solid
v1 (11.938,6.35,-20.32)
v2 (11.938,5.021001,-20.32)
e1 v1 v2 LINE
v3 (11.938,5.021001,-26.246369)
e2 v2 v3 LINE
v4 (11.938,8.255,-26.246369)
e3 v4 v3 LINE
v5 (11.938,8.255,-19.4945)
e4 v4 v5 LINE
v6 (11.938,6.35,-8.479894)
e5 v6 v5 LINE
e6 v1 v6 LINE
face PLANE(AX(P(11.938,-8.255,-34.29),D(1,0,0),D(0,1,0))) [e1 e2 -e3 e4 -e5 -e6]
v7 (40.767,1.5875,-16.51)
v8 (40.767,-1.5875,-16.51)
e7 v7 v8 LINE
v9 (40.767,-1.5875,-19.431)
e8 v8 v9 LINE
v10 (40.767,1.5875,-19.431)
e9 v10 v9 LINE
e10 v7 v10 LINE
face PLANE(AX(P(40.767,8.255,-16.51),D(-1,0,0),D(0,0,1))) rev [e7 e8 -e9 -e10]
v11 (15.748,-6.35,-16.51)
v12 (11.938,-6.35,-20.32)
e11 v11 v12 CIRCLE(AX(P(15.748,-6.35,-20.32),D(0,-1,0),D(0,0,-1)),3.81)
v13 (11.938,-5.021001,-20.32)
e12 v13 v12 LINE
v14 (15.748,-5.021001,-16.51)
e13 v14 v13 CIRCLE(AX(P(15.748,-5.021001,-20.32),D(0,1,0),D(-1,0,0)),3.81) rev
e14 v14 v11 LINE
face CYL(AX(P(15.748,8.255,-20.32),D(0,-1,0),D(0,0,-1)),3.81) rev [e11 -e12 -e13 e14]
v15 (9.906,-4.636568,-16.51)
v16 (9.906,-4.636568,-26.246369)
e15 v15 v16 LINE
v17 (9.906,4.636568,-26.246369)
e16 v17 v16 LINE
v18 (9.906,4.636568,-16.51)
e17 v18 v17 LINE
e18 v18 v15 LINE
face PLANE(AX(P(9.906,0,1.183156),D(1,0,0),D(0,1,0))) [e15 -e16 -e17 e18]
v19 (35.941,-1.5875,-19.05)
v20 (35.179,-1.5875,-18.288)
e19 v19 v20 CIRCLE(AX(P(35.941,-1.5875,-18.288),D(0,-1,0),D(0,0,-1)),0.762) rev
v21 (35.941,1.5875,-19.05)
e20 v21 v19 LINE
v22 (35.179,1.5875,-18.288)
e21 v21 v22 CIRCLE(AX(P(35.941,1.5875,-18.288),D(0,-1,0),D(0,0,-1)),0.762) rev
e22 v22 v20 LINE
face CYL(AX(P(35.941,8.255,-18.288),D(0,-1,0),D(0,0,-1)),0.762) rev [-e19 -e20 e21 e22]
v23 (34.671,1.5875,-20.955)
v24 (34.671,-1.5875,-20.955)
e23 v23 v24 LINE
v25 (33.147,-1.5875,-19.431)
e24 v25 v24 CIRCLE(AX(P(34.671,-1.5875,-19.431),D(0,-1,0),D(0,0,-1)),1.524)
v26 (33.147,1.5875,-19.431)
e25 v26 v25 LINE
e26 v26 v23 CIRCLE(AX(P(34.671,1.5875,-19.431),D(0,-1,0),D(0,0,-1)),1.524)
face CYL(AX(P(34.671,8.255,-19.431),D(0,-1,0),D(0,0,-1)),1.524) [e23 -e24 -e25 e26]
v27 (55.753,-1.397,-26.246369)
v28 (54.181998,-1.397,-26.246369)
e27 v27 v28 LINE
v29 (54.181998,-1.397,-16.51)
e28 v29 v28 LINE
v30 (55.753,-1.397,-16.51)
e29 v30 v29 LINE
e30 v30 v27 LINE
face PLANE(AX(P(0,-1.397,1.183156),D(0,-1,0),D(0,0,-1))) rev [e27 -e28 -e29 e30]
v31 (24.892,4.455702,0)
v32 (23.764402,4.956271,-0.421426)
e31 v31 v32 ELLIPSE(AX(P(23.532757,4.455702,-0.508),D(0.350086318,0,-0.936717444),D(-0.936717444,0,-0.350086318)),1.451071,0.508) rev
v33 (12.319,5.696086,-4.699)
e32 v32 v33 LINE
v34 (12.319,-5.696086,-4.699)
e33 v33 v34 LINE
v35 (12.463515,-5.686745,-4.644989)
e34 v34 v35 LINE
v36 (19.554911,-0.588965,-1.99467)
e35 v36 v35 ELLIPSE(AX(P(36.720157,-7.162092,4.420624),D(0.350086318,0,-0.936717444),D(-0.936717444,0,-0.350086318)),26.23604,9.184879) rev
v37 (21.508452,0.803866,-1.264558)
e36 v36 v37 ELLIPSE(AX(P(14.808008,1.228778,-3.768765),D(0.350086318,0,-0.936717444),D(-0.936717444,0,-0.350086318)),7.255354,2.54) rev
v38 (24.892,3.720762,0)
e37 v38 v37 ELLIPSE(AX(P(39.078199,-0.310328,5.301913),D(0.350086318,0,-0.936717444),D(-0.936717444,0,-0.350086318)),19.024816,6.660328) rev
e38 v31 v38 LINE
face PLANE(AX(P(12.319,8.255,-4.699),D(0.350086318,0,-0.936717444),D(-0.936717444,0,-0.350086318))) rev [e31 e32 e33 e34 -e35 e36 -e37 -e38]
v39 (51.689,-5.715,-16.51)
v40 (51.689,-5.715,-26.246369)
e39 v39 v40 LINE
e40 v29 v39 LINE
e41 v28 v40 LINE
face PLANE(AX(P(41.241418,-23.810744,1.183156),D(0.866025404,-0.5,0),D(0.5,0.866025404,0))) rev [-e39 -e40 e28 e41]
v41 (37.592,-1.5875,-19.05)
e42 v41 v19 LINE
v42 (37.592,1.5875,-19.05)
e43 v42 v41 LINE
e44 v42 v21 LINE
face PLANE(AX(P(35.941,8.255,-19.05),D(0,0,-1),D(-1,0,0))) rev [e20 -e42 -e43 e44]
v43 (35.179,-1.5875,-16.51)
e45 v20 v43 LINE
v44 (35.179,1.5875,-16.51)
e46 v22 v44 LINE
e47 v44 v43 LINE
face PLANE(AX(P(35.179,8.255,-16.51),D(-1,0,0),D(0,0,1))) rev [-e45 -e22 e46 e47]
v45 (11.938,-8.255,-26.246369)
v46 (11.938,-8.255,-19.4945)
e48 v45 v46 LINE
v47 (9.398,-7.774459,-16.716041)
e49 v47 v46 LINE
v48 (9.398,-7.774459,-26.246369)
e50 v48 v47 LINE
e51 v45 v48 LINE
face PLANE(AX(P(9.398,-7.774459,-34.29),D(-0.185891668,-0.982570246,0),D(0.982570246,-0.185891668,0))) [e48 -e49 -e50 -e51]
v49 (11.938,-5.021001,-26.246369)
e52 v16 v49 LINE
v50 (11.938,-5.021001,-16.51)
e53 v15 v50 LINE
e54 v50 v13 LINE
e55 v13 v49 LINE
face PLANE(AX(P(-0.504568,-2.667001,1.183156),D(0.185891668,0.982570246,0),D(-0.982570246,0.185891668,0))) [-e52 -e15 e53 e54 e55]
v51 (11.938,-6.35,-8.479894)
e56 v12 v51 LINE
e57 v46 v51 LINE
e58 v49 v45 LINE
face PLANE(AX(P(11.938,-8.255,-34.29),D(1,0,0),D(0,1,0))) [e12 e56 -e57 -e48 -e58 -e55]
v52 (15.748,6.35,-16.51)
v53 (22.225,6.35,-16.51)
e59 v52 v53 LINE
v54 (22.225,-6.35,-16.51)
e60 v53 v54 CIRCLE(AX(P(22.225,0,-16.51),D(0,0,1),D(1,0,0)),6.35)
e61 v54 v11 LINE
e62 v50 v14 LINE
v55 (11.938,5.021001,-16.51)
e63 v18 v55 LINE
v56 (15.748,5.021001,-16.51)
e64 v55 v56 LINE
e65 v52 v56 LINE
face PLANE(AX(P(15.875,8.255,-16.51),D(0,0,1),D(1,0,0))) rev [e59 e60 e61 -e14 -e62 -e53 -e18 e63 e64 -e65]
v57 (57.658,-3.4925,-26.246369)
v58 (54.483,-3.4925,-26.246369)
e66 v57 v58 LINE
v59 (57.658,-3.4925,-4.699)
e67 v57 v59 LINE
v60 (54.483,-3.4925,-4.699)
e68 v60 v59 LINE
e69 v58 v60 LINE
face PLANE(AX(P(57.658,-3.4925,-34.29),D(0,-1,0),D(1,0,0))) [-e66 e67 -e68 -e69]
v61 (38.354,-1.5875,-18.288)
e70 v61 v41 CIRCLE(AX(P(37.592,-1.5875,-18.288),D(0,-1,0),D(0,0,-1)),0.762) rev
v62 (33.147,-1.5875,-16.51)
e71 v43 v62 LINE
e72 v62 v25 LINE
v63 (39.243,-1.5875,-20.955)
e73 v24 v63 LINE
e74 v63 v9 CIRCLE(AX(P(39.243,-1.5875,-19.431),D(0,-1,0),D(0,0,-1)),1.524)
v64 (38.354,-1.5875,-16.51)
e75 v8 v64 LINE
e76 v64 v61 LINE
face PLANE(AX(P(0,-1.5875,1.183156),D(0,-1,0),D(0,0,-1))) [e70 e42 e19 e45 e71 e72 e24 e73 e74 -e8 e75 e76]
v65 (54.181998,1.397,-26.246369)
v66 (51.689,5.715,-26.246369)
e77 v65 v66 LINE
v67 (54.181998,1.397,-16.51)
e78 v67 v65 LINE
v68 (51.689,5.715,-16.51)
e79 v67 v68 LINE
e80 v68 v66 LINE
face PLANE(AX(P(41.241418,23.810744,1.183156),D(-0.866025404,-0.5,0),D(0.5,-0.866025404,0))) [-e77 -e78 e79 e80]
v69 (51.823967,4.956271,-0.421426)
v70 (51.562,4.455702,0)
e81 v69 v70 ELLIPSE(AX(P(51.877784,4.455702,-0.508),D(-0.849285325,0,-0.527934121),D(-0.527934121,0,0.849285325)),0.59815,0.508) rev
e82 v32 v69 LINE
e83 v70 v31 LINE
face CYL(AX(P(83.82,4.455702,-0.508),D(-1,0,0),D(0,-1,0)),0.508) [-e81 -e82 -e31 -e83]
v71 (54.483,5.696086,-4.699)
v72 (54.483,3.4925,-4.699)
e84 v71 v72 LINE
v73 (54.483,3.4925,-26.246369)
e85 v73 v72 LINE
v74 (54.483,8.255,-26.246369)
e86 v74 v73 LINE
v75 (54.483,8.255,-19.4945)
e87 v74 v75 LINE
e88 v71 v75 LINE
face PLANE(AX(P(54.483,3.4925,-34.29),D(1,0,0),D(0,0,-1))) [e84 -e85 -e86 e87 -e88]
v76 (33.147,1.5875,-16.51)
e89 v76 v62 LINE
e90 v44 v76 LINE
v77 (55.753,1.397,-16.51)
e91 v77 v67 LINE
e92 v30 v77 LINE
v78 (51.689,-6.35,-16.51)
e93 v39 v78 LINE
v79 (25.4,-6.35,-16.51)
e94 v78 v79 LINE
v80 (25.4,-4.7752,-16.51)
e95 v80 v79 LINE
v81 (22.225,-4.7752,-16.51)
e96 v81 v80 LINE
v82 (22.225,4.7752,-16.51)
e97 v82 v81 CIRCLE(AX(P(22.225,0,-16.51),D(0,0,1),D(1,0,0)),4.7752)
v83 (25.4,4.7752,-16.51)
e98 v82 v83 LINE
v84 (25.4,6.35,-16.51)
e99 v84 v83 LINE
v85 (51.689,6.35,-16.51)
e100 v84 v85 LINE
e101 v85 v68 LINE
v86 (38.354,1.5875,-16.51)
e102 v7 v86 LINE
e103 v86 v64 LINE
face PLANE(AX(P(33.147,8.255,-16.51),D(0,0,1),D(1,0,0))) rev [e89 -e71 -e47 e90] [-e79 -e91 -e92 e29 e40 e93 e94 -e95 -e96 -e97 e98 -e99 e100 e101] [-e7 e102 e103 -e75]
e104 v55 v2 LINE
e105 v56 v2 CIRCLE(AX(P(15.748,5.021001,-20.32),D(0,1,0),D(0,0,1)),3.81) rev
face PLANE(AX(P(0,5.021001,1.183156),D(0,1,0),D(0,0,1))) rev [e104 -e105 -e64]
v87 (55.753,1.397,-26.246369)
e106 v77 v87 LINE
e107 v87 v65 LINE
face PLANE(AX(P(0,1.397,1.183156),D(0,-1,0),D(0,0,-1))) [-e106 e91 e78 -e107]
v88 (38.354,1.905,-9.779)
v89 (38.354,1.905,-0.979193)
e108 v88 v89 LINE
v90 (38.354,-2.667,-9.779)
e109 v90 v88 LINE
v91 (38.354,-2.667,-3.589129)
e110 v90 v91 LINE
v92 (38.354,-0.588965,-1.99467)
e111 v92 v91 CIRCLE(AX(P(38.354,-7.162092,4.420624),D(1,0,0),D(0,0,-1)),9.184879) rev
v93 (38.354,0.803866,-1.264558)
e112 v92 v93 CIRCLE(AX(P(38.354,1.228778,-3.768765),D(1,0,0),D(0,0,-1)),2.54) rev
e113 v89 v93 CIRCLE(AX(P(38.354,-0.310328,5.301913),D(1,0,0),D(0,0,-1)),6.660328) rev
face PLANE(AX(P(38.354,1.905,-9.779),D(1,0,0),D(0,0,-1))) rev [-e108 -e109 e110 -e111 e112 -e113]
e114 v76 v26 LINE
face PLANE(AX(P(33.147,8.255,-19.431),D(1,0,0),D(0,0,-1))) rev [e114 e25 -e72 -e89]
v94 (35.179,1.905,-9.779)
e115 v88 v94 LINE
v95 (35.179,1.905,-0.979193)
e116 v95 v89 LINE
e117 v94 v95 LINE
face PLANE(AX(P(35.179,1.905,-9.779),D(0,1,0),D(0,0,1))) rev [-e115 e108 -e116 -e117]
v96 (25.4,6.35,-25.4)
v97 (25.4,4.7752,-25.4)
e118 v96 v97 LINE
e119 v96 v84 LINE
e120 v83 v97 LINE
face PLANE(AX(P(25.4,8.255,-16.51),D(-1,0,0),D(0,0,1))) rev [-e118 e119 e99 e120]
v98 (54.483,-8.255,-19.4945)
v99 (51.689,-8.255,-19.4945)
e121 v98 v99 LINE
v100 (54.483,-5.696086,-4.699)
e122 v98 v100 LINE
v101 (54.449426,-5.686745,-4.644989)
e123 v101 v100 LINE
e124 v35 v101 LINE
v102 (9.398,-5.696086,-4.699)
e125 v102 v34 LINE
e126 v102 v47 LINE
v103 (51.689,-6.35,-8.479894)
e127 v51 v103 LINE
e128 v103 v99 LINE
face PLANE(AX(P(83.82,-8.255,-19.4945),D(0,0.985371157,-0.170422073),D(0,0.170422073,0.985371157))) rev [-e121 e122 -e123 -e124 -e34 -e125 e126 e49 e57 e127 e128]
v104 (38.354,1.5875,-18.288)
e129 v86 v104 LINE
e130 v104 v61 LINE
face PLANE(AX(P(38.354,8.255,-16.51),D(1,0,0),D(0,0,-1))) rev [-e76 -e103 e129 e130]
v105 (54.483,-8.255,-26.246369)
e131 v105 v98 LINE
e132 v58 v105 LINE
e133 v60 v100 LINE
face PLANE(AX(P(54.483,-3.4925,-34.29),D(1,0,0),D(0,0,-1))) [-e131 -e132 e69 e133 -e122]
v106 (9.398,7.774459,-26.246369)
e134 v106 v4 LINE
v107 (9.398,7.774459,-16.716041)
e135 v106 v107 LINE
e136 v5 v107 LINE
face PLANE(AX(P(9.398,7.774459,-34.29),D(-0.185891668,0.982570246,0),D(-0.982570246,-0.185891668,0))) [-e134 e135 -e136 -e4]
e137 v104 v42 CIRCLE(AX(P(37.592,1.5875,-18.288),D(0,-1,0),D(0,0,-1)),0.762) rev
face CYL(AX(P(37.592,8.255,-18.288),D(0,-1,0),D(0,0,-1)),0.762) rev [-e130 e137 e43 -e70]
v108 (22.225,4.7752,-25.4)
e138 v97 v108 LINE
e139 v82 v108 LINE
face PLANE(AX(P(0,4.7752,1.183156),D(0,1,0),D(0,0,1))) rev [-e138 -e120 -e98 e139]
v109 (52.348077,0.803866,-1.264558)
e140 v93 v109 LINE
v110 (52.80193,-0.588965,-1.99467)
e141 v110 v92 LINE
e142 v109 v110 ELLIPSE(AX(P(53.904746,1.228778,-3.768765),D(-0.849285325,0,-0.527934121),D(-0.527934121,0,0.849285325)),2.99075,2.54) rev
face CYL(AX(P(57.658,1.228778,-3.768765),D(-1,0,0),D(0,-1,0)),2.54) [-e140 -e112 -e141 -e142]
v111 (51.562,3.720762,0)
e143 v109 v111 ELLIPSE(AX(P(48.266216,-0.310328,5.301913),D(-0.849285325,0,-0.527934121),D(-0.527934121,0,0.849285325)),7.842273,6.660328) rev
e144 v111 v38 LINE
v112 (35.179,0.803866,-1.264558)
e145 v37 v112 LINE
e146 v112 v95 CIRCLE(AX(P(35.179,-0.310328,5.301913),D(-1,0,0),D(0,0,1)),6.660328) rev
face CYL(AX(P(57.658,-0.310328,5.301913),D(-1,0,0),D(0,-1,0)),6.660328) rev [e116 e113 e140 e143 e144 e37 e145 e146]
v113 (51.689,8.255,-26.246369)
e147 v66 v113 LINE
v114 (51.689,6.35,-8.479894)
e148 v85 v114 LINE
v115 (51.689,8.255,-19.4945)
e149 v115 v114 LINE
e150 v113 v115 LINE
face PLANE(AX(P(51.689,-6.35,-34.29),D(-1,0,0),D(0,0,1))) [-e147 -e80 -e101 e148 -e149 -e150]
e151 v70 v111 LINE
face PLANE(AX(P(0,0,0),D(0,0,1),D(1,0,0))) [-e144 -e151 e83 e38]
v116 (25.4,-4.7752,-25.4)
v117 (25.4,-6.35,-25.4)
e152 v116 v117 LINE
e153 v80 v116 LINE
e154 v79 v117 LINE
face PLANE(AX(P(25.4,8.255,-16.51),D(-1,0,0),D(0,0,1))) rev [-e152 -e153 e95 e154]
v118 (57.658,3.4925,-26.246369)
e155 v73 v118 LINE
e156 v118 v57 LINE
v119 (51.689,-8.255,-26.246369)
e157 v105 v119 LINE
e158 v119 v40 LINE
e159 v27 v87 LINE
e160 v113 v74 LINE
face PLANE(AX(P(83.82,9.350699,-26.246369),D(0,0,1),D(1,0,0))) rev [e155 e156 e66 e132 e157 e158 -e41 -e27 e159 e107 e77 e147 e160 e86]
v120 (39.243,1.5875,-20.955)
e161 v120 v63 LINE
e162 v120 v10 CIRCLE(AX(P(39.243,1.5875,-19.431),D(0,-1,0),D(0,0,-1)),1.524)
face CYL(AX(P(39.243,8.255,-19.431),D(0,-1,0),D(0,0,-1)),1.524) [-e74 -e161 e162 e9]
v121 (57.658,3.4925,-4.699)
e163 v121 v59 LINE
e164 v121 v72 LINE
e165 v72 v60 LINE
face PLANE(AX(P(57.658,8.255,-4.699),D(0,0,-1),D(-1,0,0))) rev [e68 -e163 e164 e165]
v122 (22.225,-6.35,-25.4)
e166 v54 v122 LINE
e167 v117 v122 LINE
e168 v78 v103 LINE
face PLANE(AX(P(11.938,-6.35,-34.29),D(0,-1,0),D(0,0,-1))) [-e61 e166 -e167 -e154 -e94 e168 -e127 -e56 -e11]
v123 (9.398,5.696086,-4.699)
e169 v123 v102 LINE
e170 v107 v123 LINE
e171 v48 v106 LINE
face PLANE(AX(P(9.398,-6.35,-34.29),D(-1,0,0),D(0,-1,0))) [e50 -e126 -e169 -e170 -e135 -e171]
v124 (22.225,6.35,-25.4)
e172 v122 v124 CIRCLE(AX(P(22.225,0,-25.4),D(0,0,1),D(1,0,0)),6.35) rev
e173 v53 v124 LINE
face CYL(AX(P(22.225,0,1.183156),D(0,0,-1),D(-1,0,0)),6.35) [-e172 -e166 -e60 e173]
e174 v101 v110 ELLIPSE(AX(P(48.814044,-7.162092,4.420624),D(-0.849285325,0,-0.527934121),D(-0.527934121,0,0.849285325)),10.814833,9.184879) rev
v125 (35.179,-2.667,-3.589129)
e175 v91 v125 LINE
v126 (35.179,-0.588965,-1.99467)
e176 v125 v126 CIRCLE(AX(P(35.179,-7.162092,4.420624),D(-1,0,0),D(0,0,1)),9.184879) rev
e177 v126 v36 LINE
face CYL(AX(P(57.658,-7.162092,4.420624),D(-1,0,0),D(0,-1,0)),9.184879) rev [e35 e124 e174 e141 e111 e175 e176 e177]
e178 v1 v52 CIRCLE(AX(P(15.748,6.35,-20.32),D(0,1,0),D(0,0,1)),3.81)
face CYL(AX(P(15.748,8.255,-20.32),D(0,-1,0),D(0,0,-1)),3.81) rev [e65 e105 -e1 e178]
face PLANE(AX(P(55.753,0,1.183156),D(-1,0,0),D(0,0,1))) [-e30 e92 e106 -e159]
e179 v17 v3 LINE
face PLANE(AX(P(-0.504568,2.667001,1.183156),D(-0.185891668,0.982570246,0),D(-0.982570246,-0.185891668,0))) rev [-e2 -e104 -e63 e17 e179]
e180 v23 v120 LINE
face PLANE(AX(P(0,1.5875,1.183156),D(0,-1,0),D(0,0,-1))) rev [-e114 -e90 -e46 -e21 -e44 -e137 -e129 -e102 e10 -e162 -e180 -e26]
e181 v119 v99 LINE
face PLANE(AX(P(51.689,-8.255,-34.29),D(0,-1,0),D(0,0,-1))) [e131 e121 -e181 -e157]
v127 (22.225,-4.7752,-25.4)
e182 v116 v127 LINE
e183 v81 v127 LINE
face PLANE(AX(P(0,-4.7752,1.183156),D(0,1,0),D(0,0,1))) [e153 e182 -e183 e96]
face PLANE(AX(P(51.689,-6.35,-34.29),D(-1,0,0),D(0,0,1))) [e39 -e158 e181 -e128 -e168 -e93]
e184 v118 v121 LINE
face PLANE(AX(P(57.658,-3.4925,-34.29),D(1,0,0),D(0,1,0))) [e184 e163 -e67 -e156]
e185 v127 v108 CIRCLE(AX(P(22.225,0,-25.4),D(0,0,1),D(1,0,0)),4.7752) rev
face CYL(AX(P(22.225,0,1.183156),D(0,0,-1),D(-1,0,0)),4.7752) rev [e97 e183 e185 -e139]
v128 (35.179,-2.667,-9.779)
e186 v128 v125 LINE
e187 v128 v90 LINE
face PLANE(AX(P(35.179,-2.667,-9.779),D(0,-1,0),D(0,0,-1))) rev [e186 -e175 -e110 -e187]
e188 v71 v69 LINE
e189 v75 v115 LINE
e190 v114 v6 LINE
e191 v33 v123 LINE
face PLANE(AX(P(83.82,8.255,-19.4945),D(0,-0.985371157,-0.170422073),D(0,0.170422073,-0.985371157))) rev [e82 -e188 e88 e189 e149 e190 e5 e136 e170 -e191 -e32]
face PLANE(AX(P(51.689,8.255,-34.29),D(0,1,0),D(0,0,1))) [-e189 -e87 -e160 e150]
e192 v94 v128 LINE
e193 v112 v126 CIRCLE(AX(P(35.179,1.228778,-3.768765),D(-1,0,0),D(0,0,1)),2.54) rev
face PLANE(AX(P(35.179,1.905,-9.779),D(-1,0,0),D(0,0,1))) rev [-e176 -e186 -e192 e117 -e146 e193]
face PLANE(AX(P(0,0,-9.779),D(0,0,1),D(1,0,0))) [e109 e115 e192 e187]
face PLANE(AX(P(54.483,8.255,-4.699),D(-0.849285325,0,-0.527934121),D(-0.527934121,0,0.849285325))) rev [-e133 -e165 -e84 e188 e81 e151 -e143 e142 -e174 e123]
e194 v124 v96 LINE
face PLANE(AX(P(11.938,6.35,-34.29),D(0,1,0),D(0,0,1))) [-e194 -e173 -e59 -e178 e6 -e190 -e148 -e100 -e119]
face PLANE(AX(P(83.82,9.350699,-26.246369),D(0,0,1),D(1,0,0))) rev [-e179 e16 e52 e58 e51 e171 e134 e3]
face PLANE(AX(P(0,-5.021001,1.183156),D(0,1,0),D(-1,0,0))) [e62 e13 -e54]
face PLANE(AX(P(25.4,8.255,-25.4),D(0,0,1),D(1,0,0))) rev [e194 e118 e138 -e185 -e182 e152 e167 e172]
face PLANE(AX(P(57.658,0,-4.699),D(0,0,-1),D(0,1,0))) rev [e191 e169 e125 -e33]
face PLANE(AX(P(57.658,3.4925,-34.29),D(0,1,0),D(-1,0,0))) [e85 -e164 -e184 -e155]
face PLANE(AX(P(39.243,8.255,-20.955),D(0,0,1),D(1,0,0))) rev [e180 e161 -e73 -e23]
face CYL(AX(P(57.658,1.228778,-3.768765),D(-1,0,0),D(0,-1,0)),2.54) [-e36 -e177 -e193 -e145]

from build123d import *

# Parameters (mm, degrees)
BOSS_EXTRUDE1_DEPTH    = 34.29
SKETCH2_W              = 4.699
SKETCH2_H              = 1.424459459
SKETCH2_H_2            = 0.480540541
CUT_EXTRUDE1_DEPTH     = 60.774381845
SKETCH3_W              = 3.175
SKETCH3_H              = 4.572
CUT_EXTRUDE2_DEPTH     = 9.779
CUT_EXTRUDE3_DEPTH     = 70.085665402
CUT_EXTRUDE4_START     = -17.78
CUT_EXTRUDE4_OUTLINE_W = 7.62
CUT_EXTRUDE4_OUTLINE_H = 4.7625
CUT_EXTRUDE4_DEPTH     = 17.78
SKETCH6_W              = 10.915170011
SKETCH6_H              = 18.687954265
CUT_EXTRUDE5_DEPTH     = 74.422
CUT_EXTRUDE6_DEPTH     = 74.422
FILLET2_R              = 0.508
FILLET3_R              = 2.54


# Read off the part's stored shape, not the designer's step: Cut-Extrude4
with BuildPart() as part:
    # Sketch1 → Boss-Extrude1 (new body)
    with BuildSketch(Plane.XY):
        Polygon((9.398, 6.35), (9.398, -6.35), (9.398, -7.774459459), (11.938, -8.255), (11.938, -6.35), (51.689, -6.35), (51.689, -8.255), (54.483, -8.255), (54.483, -3.4925), (57.658, -3.4925), (57.658, 3.4925), (54.483, 3.4925), (54.483, 8.255), (51.689, 8.255), (51.689, 6.35), (11.938, 6.35), (11.938, 8.255), (9.398, 7.774459459), align=None)
    extrude(amount=-BOSS_EXTRUDE1_DEPTH)

    # Sketch2 → Cut-Extrude1 (cut, through all)
    with BuildSketch(Plane.ZY.offset(-9.398)):
        with BuildLine():
            ThreePointArc((11.962240433, -0.310327796), (7.428822396, 6.001266395), (0, 3.720762472))
            Line((0, 3.720762472), (0, 0.889))
            ThreePointArc((0, 0.889), (6.395096144, 1.80805092), (11.813233179, -1.711281452))
            ThreePointArc((11.813233179, -1.711281452), (11.924883856, -1.014755633), (11.962240433, -0.310327796))
        make_face()
        with BuildLine():
            Line((0, 0.889), (0, 3.720762472))
            ThreePointArc((0, 3.720762472), (-0.961463724, 1.954640839), (-1.351994264, -0.017942243))
            ThreePointArc((-1.351994264, -0.017942243), (-0.696131125, 0.465542965), (0, 0.889))
        make_face()
        with BuildLine():
            ThreePointArc((0, 0.889), (-0.696131125, 0.465542965), (-1.351994264, -0.017942243))
            ThreePointArc((-1.351994264, -0.017942243), (-1.054856668, -2.298153331), (0, -4.341418064))
            Line((0, -4.341418064), (0, 0.889))
        make_face()
        with BuildLine():
            ThreePointArc((11.813233179, -1.711281452), (6.395096144, 1.80805092), (0, 0.889))
            Line((0, 0.889), (0, -4.341418064))
            ThreePointArc((0, -4.341418064), (6.749348825, -6.811473452), (11.813233179, -1.711281452))
        make_face()
        with BuildLine():
            ThreePointArc((0, -4.341418064), (-1.054856668, -2.298153331), (-1.351994264, -0.017942243))
            ThreePointArc((-1.351994264, -0.017942243), (-3.994827922, -3.482124307), (-4.743817945, -7.774459459))
            Line((-4.743817945, -7.774459459), (0, -7.774459459))
            Line((0, -7.774459459), (0, -4.341418064))
        make_face()
        with Locations((-2.3495, 7.06222973)):
            Rectangle(SKETCH2_W, SKETCH2_H)
        with Locations((-2.3495, 8.01472973)):
            Rectangle(SKETCH2_W, SKETCH2_H_2)
        with BuildLine():
            Line((0, -7.774459459), (-4.743817945, -7.774459459))
            ThreePointArc((-4.743817945, -7.774459459), (-4.72456581, -8.015024154), (-4.699, -8.255))
            Line((-4.699, -8.255), (0, -8.255))
            Line((0, -8.255), (0, -7.774459459))
        make_face()
    extrude(amount=-CUT_EXTRUDE1_DEPTH, mode=Mode.SUBTRACT)

    # Sketch3 → Cut-Extrude2 (cut)
    with BuildSketch(Plane.XY):
        with Locations((36.7665, -0.381)):
            Rectangle(SKETCH3_W, SKETCH3_H)
    extrude(amount=-CUT_EXTRUDE2_DEPTH, mode=Mode.SUBTRACT)

    # Sketch4 → Cut-Extrude3 (cut, through all)
    with BuildSketch(Plane.XZ.offset(8.255)):
        with BuildLine():
            Line((51.689, -34.29), (51.689, -16.51))
            Line((51.689, -16.51), (40.767, -16.51))
            Line((40.767, -16.51), (40.767, -19.431))
            ThreePointArc((40.767, -19.431), (40.320630735, -20.508630735), (39.243, -20.955))
            Line((39.243, -20.955), (34.671, -20.955))
            ThreePointArc((34.671, -20.955), (33.593369265, -20.508630735), (33.147, -19.431))
            Line((33.147, -19.431), (33.147, -16.51))
            Line((33.147, -16.51), (25.4, -16.51))
            Line((25.4, -16.51), (25.4, -25.4))
            Line((25.4, -25.4), (15.875, -25.4))
            Line((15.875, -25.4), (15.875, -16.51))
            Line((15.875, -16.51), (15.748, -16.51))
            ThreePointArc((15.748, -16.51), (13.053923164, -17.625923164), (11.938, -20.32))
            Line((11.938, -20.32), (11.938, -34.29))
            Line((11.938, -34.29), (51.689, -34.29))
        make_face()
        with BuildLine():
            Line((35.179, -16.51), (38.354, -16.51))
            Line((38.354, -16.51), (38.354, -18.288))
            ThreePointArc((38.354, -18.288), (38.130815367, -18.826815367), (37.592, -19.05))
            Line((37.592, -19.05), (35.941, -19.05))
            ThreePointArc((35.941, -19.05), (35.402184633, -18.826815367), (35.179, -18.288))
            Line((35.179, -18.288), (35.179, -16.51))
        make_face()
        Polygon((57.658, -4.699), (54.483, -4.699), (51.562, 0), (57.658, 0), align=None)
        Polygon((6.604, -4.699), (12.319, -4.699), (24.892, 0), (6.604, 0), align=None)
    extrude(amount=-CUT_EXTRUDE3_DEPTH, mode=Mode.SUBTRACT)

    # Cut-Extrude4 outline → Cut-Extrude4 (cut)
    with BuildSketch(Plane(origin=(0, 0, -34.29), x_dir=(-1, 0, 0), z_dir=(0, 0, -1)).offset(CUT_EXTRUDE4_START)):
        with BuildLine():
            Line((-22.225, -6.35), (-15.875, -6.35))
            Line((-15.875, -6.35), (-15.875, -5.021000706))
            Line((-15.875, -5.021000706), (-11.938, -5.021000706))
            Line((-11.938, -5.021000706), (-9.906, -4.636568273))
            Line((-9.906, -4.636568273), (-9.906, 4.636568273))
            Line((-9.906, 4.636568273), (-11.938, 5.021000706))
            Line((-11.938, 5.021000706), (-15.875, 5.021000706))
            Line((-15.875, 5.021000706), (-15.875, 6.35))
            Line((-15.875, 6.35), (-22.225, 6.35))
            ThreePointArc((-22.225, 6.35), (-15.875, 0), (-22.225, -6.35))
        make_face()
        with Locations((-36.957, -3.96875)):
            Rectangle(CUT_EXTRUDE4_OUTLINE_W, CUT_EXTRUDE4_OUTLINE_H)
        with BuildLine():
            Line((-25.4, 4.7752), (-25.4, -4.7752))
            Line((-25.4, -4.7752), (-22.225, -4.7752))
            ThreePointArc((-22.225, -4.7752), (-17.4498, 0), (-22.225, 4.7752))
            Line((-22.225, 4.7752), (-25.4, 4.7752))
        make_face()
        with Locations((-36.957, 3.96875)):
            Rectangle(CUT_EXTRUDE4_OUTLINE_W, CUT_EXTRUDE4_OUTLINE_H)
        Polygon((-54.181998462, -1.397), (-51.689, -5.715), (-51.689, 5.715), (-54.181998462, 1.397), (-55.753, 1.397), (-55.753, -1.397), align=None)
    extrude(amount=CUT_EXTRUDE4_DEPTH, mode=Mode.SUBTRACT)

    # Sketch6 → Cut-Extrude5 (cut)
    with BuildSketch(Plane.ZY.offset(-9.398)):
        with Locations((-31.703953975, 0.006721575)):
            Rectangle(SKETCH6_W, SKETCH6_H)
    extrude(amount=-CUT_EXTRUDE5_DEPTH, mode=Mode.SUBTRACT)

    # Sketch7 → Cut-Extrude6 (cut)
    with BuildSketch(Plane.ZY.offset(-9.398)):
        Polygon((-19.4945, 8.255), (-19.4945, 8.707804747), (-4.699, 8.83298433), (3.124174595, 8.83298433), (3.124174595, 5.342724301), (3.124174595, 4.343051296), align=None)
        Polygon((3.124174595, -4.343051296), (3.124174595, -5.342724301), (3.124174595, -8.83298433), (-4.699, -8.83298433), (-19.4945, -8.707804747), (-19.4945, -8.255), align=None)
    extrude(amount=-CUT_EXTRUDE6_DEPTH, mode=Mode.SUBTRACT)

    # Fillet2
    fillet2_edges = [part.edges().sort_by_distance(p)[0] for p in [
        (38.227, 4.883384051, 0),
    ]]
    fillet(fillet2_edges, radius=FILLET2_R)

    # Fillet3
    fillet3_edges = [part.edges().sort_by_distance(p)[0] for p in [
        (45.378214433, -0.017942243, -1.351994264),
        (28.226750917, -0.017942243, -1.351994264),
    ]]
    fillet(fillet3_edges, radius=FILLET3_R)


solid = part.part
